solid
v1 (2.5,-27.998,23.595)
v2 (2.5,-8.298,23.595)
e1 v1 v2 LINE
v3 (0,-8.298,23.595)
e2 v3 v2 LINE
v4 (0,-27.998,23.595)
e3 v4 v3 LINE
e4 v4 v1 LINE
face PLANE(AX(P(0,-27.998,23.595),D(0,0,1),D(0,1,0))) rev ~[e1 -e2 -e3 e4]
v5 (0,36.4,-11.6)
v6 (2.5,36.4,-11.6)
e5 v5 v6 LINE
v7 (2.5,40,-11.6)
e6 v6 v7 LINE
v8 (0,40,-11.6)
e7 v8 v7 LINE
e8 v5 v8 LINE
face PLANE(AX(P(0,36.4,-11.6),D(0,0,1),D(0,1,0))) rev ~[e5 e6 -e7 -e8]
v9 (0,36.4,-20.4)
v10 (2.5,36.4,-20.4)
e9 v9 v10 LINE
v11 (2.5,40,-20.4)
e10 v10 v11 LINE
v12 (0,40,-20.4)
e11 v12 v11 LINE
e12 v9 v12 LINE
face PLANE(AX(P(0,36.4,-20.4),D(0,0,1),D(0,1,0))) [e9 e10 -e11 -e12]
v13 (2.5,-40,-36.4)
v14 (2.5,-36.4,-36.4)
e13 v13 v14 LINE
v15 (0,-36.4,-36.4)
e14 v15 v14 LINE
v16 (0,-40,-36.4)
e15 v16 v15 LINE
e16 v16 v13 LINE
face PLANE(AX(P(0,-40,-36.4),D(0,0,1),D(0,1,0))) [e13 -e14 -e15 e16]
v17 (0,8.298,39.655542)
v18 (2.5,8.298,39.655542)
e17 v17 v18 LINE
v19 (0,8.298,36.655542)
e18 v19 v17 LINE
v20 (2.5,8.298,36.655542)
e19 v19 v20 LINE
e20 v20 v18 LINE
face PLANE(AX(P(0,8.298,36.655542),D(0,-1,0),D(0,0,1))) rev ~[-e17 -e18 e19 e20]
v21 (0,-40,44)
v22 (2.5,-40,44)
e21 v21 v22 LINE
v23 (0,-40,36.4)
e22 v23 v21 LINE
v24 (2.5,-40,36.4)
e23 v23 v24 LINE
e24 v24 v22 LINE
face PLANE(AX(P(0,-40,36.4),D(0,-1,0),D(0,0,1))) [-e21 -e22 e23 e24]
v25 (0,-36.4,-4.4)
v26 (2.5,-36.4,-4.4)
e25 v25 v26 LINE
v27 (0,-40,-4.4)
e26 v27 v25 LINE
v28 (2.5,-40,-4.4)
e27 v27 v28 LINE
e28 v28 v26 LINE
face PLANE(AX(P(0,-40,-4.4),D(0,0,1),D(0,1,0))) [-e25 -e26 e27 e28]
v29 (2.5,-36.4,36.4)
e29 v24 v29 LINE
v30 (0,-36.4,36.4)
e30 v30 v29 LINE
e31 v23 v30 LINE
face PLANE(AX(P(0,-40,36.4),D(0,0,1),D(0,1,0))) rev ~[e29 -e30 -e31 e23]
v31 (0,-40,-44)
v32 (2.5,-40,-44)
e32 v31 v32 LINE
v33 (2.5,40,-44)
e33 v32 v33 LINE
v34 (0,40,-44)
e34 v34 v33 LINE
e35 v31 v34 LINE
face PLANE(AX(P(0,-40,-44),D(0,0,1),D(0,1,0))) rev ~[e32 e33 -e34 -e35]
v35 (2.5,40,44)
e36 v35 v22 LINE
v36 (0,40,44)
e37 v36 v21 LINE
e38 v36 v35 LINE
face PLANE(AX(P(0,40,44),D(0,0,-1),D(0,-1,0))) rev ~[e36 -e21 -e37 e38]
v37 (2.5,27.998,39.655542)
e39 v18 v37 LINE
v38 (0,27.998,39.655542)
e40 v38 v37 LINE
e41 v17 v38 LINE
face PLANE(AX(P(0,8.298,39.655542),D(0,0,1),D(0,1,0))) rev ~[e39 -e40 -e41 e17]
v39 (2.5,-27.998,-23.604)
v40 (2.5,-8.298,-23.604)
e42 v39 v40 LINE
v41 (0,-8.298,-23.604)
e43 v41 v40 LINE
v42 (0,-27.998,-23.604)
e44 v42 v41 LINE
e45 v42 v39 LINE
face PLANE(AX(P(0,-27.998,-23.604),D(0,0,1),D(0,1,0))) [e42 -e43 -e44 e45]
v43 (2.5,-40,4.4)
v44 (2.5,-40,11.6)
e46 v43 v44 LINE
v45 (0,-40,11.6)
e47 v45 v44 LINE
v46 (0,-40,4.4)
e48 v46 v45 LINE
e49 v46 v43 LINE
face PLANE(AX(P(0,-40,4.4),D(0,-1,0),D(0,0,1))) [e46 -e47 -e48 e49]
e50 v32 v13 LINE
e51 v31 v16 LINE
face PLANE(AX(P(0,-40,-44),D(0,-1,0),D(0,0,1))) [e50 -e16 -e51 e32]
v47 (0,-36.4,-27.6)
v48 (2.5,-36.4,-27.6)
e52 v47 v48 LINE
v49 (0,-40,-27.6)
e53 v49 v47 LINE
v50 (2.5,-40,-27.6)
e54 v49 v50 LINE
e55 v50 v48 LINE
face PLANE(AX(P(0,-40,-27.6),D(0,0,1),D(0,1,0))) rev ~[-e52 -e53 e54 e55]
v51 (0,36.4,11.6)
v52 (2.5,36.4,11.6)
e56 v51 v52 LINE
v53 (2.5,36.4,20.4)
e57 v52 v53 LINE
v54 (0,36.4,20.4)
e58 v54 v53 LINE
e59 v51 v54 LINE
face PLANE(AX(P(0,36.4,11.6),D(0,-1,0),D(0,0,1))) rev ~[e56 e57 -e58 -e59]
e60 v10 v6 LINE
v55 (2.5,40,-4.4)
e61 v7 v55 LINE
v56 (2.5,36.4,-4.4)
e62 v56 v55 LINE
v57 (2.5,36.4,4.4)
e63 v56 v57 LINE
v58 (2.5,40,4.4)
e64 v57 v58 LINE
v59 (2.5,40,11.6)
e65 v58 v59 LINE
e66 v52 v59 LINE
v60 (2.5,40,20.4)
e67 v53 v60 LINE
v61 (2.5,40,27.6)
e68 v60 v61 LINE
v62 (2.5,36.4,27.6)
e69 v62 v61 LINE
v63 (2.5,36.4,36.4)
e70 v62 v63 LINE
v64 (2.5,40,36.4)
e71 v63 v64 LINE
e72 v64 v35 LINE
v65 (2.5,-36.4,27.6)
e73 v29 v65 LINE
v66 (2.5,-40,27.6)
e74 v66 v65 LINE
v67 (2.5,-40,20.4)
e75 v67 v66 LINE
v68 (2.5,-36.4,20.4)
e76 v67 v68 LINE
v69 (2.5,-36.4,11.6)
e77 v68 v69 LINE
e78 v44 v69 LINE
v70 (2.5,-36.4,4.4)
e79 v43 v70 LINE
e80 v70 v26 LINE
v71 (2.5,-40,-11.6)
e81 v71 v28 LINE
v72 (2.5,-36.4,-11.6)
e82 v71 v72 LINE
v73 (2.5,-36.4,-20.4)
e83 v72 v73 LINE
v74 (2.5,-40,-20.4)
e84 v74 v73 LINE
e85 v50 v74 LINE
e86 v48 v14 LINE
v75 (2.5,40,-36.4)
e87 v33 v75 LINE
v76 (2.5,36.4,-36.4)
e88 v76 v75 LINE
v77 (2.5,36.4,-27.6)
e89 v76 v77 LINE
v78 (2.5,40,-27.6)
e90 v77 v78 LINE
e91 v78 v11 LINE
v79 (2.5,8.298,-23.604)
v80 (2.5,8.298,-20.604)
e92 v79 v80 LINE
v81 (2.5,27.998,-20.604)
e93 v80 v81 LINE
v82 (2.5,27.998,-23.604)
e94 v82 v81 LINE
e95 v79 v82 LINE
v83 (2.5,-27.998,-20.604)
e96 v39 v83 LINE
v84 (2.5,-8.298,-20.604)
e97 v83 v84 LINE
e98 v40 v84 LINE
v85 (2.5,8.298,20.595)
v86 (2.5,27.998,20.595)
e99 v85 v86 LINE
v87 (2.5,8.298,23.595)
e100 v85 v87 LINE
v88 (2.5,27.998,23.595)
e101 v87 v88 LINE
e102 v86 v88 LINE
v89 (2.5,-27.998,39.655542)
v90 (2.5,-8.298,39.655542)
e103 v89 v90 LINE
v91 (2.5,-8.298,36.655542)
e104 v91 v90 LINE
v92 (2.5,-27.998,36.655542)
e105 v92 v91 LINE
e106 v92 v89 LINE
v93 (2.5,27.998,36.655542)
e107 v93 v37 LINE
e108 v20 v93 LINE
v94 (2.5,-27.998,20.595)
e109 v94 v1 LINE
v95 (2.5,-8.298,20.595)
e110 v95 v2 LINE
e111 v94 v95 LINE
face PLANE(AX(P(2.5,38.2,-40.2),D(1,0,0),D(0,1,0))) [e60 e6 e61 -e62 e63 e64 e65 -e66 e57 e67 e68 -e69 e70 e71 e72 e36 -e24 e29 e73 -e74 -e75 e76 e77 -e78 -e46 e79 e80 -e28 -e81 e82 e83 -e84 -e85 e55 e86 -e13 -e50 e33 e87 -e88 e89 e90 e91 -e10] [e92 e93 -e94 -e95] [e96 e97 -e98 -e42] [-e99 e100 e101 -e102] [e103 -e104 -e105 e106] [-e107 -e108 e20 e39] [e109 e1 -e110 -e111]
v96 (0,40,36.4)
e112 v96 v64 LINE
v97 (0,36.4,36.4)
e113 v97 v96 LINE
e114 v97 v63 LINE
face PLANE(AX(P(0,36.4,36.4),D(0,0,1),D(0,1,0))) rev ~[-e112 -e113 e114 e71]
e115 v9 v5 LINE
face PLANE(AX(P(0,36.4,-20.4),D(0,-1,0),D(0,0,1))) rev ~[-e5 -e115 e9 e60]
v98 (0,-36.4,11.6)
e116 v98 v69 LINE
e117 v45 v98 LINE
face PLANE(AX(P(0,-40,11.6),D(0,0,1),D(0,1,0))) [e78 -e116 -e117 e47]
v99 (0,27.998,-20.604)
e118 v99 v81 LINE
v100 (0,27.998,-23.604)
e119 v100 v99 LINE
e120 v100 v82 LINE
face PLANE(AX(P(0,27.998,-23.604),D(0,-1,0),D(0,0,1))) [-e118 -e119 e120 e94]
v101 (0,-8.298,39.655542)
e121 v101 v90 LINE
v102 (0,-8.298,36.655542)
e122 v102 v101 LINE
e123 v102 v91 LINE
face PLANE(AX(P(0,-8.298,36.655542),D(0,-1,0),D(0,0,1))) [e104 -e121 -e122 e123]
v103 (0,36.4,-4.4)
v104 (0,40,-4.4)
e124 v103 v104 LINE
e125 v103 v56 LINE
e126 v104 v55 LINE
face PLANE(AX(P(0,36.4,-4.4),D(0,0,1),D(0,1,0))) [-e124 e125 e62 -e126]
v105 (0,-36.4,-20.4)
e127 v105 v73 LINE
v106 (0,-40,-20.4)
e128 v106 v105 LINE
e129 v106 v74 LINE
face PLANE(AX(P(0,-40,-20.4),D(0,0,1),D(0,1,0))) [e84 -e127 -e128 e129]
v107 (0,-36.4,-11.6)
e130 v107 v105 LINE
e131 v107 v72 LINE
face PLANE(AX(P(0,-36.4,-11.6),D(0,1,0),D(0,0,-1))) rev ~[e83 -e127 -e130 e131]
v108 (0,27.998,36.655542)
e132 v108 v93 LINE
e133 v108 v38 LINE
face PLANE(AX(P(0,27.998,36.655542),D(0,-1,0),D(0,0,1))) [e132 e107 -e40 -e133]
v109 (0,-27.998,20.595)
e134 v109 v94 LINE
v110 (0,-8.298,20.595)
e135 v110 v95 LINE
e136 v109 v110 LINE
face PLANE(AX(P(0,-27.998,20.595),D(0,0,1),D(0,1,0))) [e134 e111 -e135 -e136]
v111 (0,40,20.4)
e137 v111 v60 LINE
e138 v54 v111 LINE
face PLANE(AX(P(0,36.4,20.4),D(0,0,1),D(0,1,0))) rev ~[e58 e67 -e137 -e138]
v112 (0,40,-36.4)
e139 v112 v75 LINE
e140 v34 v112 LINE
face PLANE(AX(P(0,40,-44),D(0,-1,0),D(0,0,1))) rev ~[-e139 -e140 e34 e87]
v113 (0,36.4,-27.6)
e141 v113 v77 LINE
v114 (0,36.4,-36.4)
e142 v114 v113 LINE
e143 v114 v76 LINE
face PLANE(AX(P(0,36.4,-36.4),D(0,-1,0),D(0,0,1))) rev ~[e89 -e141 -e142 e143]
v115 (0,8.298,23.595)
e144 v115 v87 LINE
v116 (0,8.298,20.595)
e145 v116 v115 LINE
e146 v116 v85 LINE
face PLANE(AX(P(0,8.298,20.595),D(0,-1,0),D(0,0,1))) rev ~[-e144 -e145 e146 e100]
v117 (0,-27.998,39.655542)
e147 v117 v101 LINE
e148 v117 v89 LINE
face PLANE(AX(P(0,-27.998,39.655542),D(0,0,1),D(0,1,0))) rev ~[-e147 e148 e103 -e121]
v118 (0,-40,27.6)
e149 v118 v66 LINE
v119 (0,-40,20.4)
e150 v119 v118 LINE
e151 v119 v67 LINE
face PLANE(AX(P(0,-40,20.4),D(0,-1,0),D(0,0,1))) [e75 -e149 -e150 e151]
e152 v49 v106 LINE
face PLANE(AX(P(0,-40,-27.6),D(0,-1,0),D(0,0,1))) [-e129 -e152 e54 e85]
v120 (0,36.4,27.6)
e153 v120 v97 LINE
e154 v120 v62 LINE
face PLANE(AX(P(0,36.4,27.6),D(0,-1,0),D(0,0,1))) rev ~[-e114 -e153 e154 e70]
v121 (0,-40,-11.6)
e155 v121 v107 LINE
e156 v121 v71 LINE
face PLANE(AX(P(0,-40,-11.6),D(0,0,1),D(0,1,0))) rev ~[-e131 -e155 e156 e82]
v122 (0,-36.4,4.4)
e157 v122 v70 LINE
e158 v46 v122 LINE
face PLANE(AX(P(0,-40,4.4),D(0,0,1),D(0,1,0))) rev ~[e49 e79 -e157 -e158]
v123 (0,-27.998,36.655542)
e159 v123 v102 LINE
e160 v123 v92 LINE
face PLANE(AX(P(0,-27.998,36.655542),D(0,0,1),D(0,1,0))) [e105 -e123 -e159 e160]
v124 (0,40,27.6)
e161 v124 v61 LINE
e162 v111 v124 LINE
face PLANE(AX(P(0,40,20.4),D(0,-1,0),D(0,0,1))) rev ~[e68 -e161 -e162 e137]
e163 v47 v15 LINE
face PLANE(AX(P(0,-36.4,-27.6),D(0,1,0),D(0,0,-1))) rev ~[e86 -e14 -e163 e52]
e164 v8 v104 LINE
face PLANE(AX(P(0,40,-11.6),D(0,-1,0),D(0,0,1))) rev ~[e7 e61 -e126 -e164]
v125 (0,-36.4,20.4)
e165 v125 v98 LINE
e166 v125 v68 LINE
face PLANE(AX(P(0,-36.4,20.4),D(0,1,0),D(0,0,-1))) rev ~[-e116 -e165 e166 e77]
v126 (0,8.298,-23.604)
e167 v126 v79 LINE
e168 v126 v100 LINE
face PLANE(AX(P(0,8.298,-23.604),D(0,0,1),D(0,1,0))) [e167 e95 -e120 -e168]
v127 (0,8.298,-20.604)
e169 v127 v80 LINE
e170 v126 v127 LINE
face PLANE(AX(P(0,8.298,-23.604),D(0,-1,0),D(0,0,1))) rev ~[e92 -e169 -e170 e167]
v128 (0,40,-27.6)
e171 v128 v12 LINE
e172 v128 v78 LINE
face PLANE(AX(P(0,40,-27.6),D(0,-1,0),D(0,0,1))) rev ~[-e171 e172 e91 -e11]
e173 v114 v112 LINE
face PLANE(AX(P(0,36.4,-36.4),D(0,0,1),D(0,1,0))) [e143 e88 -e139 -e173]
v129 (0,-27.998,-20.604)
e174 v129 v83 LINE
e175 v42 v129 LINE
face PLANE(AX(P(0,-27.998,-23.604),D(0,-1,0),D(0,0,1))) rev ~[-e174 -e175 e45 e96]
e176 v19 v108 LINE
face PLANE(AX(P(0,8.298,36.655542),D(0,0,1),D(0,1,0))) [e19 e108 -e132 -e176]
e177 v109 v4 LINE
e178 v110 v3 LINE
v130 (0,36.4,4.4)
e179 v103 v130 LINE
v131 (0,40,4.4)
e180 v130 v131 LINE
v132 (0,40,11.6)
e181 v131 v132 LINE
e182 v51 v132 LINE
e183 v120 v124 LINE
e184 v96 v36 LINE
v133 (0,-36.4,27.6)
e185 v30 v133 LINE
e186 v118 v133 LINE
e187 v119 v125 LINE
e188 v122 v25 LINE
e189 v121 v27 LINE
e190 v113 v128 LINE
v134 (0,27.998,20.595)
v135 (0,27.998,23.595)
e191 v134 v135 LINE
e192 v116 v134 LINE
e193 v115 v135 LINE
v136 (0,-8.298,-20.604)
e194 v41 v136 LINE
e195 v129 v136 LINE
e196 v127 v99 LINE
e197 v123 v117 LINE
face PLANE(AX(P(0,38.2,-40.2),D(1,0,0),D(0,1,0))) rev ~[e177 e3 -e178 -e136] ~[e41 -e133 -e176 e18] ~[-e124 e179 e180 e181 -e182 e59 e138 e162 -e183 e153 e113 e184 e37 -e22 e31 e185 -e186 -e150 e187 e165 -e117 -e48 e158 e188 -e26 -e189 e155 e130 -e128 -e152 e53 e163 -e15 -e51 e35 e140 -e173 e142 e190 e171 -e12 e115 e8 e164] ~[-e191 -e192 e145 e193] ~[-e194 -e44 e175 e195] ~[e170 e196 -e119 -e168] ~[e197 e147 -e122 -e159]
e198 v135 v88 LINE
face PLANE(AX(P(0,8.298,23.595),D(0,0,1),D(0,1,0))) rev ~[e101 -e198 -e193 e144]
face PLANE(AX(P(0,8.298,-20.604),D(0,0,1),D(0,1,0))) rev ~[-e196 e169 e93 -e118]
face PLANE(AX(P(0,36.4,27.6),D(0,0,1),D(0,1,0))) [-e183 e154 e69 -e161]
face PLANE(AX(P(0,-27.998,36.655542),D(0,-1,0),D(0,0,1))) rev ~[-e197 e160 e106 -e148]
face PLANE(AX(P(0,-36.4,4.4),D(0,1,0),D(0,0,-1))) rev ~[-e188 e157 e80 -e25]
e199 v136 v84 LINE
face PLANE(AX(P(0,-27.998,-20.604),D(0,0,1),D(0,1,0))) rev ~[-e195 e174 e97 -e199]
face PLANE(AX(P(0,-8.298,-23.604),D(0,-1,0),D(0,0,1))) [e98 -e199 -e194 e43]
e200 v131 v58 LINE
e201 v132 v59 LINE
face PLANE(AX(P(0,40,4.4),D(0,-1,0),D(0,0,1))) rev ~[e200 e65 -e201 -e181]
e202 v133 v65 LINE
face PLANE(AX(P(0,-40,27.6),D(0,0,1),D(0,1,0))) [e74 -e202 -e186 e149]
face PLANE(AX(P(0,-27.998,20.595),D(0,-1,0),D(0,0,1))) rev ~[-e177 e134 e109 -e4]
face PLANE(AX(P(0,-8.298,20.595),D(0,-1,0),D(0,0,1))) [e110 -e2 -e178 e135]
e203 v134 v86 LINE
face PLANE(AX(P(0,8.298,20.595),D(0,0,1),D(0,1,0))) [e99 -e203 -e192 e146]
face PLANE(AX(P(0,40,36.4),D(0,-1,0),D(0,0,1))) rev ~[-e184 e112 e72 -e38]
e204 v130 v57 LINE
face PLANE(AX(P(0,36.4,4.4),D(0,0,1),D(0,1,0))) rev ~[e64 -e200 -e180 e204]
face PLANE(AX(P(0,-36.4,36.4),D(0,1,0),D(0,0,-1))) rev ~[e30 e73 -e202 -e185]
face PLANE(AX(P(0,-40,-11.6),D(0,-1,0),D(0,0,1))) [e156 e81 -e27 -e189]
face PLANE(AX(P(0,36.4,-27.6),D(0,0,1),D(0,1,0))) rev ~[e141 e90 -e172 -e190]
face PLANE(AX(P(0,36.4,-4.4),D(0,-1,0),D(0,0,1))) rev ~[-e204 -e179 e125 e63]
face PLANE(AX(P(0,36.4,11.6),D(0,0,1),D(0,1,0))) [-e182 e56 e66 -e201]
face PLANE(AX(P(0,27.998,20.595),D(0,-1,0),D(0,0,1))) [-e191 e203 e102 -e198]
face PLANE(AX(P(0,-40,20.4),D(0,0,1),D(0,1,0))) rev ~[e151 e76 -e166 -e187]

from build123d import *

# Parameters (mm, degrees)
F0_W     = 3.6
F0_H     = 7.6
F0_H_2   = 7.2
F0_W_2   = 19.7
F0_H_3   = 3
F1_DEPTH = 2.5


# Not quite as in the source:
# - a feature names something its author has since deleted; it is built from what else it names


with BuildPart() as f1:
    # F0 (on Right) → F1 (new body)
    with BuildSketch(Plane.YZ):
        with Locations((38.2, -40.2)):
            Rectangle(F0_W, F0_H)
        with Locations((-38.2, -40.2)):
            Rectangle(F0_W, F0_H)
        with Locations((38.2, 40.2)):
            Rectangle(F0_W, F0_H)
        with Locations((-38.2, 40.2)):
            Rectangle(F0_W, F0_H)
        with Locations((38.2, -8)):
            Rectangle(F0_W, F0_H_2)
        with Locations((-38.2, -8)):
            Rectangle(F0_W, F0_H_2)
        Polygon((-36.4, -36.4), (-36.4, -44), (36.4, -44), (36.4, -36.4), (36.4, -27.6), (36.4, -20.4), (36.4, -11.6), (36.4, -4.4), (36.4, 4.4), (36.4, 11.6), (36.4, 20.4), (36.4, 27.6), (36.4, 36.4), (36.4, 44), (-36.4, 44), (-36.4, 36.4), (-36.4, 27.6), (-36.4, 20.4), (-36.4, 11.6), (-36.4, 4.4), (-36.4, -4.4), (-36.4, -11.6), (-36.4, -20.4), (-36.4, -27.6), align=None)
        with Locations((-18.148, -22.104)):
            Rectangle(F0_W_2, F0_H_3, mode=Mode.SUBTRACT)
        with Locations((18.148, -22.104)):
            Rectangle(F0_W_2, F0_H_3, mode=Mode.SUBTRACT)
        with Locations((-18.148, 22.095)):
            Rectangle(F0_W_2, F0_H_3, mode=Mode.SUBTRACT)
        with Locations((-18.148, 38.1555415094)):
            Rectangle(F0_W_2, F0_H_3, mode=Mode.SUBTRACT)
        with Locations((18.148, 22.095)):
            Rectangle(F0_W_2, F0_H_3, mode=Mode.SUBTRACT)
        with Locations((18.148, 38.1555415094)):
            Rectangle(F0_W_2, F0_H_3, mode=Mode.SUBTRACT)
        with Locations((38.2, -24)):
            Rectangle(F0_W, F0_H_2)
        with Locations((-38.2, -24)):
            Rectangle(F0_W, F0_H_2)
        with Locations((38.2, 8)):
            Rectangle(F0_W, F0_H_2)
        with Locations((-38.2, 24)):
            Rectangle(F0_W, F0_H_2)
        with Locations((38.2, 24)):
            Rectangle(F0_W, F0_H_2)
        with Locations((-38.2, 8)):
            Rectangle(F0_W, F0_H_2)
    extrude(amount=F1_DEPTH)


solid = f1.part
